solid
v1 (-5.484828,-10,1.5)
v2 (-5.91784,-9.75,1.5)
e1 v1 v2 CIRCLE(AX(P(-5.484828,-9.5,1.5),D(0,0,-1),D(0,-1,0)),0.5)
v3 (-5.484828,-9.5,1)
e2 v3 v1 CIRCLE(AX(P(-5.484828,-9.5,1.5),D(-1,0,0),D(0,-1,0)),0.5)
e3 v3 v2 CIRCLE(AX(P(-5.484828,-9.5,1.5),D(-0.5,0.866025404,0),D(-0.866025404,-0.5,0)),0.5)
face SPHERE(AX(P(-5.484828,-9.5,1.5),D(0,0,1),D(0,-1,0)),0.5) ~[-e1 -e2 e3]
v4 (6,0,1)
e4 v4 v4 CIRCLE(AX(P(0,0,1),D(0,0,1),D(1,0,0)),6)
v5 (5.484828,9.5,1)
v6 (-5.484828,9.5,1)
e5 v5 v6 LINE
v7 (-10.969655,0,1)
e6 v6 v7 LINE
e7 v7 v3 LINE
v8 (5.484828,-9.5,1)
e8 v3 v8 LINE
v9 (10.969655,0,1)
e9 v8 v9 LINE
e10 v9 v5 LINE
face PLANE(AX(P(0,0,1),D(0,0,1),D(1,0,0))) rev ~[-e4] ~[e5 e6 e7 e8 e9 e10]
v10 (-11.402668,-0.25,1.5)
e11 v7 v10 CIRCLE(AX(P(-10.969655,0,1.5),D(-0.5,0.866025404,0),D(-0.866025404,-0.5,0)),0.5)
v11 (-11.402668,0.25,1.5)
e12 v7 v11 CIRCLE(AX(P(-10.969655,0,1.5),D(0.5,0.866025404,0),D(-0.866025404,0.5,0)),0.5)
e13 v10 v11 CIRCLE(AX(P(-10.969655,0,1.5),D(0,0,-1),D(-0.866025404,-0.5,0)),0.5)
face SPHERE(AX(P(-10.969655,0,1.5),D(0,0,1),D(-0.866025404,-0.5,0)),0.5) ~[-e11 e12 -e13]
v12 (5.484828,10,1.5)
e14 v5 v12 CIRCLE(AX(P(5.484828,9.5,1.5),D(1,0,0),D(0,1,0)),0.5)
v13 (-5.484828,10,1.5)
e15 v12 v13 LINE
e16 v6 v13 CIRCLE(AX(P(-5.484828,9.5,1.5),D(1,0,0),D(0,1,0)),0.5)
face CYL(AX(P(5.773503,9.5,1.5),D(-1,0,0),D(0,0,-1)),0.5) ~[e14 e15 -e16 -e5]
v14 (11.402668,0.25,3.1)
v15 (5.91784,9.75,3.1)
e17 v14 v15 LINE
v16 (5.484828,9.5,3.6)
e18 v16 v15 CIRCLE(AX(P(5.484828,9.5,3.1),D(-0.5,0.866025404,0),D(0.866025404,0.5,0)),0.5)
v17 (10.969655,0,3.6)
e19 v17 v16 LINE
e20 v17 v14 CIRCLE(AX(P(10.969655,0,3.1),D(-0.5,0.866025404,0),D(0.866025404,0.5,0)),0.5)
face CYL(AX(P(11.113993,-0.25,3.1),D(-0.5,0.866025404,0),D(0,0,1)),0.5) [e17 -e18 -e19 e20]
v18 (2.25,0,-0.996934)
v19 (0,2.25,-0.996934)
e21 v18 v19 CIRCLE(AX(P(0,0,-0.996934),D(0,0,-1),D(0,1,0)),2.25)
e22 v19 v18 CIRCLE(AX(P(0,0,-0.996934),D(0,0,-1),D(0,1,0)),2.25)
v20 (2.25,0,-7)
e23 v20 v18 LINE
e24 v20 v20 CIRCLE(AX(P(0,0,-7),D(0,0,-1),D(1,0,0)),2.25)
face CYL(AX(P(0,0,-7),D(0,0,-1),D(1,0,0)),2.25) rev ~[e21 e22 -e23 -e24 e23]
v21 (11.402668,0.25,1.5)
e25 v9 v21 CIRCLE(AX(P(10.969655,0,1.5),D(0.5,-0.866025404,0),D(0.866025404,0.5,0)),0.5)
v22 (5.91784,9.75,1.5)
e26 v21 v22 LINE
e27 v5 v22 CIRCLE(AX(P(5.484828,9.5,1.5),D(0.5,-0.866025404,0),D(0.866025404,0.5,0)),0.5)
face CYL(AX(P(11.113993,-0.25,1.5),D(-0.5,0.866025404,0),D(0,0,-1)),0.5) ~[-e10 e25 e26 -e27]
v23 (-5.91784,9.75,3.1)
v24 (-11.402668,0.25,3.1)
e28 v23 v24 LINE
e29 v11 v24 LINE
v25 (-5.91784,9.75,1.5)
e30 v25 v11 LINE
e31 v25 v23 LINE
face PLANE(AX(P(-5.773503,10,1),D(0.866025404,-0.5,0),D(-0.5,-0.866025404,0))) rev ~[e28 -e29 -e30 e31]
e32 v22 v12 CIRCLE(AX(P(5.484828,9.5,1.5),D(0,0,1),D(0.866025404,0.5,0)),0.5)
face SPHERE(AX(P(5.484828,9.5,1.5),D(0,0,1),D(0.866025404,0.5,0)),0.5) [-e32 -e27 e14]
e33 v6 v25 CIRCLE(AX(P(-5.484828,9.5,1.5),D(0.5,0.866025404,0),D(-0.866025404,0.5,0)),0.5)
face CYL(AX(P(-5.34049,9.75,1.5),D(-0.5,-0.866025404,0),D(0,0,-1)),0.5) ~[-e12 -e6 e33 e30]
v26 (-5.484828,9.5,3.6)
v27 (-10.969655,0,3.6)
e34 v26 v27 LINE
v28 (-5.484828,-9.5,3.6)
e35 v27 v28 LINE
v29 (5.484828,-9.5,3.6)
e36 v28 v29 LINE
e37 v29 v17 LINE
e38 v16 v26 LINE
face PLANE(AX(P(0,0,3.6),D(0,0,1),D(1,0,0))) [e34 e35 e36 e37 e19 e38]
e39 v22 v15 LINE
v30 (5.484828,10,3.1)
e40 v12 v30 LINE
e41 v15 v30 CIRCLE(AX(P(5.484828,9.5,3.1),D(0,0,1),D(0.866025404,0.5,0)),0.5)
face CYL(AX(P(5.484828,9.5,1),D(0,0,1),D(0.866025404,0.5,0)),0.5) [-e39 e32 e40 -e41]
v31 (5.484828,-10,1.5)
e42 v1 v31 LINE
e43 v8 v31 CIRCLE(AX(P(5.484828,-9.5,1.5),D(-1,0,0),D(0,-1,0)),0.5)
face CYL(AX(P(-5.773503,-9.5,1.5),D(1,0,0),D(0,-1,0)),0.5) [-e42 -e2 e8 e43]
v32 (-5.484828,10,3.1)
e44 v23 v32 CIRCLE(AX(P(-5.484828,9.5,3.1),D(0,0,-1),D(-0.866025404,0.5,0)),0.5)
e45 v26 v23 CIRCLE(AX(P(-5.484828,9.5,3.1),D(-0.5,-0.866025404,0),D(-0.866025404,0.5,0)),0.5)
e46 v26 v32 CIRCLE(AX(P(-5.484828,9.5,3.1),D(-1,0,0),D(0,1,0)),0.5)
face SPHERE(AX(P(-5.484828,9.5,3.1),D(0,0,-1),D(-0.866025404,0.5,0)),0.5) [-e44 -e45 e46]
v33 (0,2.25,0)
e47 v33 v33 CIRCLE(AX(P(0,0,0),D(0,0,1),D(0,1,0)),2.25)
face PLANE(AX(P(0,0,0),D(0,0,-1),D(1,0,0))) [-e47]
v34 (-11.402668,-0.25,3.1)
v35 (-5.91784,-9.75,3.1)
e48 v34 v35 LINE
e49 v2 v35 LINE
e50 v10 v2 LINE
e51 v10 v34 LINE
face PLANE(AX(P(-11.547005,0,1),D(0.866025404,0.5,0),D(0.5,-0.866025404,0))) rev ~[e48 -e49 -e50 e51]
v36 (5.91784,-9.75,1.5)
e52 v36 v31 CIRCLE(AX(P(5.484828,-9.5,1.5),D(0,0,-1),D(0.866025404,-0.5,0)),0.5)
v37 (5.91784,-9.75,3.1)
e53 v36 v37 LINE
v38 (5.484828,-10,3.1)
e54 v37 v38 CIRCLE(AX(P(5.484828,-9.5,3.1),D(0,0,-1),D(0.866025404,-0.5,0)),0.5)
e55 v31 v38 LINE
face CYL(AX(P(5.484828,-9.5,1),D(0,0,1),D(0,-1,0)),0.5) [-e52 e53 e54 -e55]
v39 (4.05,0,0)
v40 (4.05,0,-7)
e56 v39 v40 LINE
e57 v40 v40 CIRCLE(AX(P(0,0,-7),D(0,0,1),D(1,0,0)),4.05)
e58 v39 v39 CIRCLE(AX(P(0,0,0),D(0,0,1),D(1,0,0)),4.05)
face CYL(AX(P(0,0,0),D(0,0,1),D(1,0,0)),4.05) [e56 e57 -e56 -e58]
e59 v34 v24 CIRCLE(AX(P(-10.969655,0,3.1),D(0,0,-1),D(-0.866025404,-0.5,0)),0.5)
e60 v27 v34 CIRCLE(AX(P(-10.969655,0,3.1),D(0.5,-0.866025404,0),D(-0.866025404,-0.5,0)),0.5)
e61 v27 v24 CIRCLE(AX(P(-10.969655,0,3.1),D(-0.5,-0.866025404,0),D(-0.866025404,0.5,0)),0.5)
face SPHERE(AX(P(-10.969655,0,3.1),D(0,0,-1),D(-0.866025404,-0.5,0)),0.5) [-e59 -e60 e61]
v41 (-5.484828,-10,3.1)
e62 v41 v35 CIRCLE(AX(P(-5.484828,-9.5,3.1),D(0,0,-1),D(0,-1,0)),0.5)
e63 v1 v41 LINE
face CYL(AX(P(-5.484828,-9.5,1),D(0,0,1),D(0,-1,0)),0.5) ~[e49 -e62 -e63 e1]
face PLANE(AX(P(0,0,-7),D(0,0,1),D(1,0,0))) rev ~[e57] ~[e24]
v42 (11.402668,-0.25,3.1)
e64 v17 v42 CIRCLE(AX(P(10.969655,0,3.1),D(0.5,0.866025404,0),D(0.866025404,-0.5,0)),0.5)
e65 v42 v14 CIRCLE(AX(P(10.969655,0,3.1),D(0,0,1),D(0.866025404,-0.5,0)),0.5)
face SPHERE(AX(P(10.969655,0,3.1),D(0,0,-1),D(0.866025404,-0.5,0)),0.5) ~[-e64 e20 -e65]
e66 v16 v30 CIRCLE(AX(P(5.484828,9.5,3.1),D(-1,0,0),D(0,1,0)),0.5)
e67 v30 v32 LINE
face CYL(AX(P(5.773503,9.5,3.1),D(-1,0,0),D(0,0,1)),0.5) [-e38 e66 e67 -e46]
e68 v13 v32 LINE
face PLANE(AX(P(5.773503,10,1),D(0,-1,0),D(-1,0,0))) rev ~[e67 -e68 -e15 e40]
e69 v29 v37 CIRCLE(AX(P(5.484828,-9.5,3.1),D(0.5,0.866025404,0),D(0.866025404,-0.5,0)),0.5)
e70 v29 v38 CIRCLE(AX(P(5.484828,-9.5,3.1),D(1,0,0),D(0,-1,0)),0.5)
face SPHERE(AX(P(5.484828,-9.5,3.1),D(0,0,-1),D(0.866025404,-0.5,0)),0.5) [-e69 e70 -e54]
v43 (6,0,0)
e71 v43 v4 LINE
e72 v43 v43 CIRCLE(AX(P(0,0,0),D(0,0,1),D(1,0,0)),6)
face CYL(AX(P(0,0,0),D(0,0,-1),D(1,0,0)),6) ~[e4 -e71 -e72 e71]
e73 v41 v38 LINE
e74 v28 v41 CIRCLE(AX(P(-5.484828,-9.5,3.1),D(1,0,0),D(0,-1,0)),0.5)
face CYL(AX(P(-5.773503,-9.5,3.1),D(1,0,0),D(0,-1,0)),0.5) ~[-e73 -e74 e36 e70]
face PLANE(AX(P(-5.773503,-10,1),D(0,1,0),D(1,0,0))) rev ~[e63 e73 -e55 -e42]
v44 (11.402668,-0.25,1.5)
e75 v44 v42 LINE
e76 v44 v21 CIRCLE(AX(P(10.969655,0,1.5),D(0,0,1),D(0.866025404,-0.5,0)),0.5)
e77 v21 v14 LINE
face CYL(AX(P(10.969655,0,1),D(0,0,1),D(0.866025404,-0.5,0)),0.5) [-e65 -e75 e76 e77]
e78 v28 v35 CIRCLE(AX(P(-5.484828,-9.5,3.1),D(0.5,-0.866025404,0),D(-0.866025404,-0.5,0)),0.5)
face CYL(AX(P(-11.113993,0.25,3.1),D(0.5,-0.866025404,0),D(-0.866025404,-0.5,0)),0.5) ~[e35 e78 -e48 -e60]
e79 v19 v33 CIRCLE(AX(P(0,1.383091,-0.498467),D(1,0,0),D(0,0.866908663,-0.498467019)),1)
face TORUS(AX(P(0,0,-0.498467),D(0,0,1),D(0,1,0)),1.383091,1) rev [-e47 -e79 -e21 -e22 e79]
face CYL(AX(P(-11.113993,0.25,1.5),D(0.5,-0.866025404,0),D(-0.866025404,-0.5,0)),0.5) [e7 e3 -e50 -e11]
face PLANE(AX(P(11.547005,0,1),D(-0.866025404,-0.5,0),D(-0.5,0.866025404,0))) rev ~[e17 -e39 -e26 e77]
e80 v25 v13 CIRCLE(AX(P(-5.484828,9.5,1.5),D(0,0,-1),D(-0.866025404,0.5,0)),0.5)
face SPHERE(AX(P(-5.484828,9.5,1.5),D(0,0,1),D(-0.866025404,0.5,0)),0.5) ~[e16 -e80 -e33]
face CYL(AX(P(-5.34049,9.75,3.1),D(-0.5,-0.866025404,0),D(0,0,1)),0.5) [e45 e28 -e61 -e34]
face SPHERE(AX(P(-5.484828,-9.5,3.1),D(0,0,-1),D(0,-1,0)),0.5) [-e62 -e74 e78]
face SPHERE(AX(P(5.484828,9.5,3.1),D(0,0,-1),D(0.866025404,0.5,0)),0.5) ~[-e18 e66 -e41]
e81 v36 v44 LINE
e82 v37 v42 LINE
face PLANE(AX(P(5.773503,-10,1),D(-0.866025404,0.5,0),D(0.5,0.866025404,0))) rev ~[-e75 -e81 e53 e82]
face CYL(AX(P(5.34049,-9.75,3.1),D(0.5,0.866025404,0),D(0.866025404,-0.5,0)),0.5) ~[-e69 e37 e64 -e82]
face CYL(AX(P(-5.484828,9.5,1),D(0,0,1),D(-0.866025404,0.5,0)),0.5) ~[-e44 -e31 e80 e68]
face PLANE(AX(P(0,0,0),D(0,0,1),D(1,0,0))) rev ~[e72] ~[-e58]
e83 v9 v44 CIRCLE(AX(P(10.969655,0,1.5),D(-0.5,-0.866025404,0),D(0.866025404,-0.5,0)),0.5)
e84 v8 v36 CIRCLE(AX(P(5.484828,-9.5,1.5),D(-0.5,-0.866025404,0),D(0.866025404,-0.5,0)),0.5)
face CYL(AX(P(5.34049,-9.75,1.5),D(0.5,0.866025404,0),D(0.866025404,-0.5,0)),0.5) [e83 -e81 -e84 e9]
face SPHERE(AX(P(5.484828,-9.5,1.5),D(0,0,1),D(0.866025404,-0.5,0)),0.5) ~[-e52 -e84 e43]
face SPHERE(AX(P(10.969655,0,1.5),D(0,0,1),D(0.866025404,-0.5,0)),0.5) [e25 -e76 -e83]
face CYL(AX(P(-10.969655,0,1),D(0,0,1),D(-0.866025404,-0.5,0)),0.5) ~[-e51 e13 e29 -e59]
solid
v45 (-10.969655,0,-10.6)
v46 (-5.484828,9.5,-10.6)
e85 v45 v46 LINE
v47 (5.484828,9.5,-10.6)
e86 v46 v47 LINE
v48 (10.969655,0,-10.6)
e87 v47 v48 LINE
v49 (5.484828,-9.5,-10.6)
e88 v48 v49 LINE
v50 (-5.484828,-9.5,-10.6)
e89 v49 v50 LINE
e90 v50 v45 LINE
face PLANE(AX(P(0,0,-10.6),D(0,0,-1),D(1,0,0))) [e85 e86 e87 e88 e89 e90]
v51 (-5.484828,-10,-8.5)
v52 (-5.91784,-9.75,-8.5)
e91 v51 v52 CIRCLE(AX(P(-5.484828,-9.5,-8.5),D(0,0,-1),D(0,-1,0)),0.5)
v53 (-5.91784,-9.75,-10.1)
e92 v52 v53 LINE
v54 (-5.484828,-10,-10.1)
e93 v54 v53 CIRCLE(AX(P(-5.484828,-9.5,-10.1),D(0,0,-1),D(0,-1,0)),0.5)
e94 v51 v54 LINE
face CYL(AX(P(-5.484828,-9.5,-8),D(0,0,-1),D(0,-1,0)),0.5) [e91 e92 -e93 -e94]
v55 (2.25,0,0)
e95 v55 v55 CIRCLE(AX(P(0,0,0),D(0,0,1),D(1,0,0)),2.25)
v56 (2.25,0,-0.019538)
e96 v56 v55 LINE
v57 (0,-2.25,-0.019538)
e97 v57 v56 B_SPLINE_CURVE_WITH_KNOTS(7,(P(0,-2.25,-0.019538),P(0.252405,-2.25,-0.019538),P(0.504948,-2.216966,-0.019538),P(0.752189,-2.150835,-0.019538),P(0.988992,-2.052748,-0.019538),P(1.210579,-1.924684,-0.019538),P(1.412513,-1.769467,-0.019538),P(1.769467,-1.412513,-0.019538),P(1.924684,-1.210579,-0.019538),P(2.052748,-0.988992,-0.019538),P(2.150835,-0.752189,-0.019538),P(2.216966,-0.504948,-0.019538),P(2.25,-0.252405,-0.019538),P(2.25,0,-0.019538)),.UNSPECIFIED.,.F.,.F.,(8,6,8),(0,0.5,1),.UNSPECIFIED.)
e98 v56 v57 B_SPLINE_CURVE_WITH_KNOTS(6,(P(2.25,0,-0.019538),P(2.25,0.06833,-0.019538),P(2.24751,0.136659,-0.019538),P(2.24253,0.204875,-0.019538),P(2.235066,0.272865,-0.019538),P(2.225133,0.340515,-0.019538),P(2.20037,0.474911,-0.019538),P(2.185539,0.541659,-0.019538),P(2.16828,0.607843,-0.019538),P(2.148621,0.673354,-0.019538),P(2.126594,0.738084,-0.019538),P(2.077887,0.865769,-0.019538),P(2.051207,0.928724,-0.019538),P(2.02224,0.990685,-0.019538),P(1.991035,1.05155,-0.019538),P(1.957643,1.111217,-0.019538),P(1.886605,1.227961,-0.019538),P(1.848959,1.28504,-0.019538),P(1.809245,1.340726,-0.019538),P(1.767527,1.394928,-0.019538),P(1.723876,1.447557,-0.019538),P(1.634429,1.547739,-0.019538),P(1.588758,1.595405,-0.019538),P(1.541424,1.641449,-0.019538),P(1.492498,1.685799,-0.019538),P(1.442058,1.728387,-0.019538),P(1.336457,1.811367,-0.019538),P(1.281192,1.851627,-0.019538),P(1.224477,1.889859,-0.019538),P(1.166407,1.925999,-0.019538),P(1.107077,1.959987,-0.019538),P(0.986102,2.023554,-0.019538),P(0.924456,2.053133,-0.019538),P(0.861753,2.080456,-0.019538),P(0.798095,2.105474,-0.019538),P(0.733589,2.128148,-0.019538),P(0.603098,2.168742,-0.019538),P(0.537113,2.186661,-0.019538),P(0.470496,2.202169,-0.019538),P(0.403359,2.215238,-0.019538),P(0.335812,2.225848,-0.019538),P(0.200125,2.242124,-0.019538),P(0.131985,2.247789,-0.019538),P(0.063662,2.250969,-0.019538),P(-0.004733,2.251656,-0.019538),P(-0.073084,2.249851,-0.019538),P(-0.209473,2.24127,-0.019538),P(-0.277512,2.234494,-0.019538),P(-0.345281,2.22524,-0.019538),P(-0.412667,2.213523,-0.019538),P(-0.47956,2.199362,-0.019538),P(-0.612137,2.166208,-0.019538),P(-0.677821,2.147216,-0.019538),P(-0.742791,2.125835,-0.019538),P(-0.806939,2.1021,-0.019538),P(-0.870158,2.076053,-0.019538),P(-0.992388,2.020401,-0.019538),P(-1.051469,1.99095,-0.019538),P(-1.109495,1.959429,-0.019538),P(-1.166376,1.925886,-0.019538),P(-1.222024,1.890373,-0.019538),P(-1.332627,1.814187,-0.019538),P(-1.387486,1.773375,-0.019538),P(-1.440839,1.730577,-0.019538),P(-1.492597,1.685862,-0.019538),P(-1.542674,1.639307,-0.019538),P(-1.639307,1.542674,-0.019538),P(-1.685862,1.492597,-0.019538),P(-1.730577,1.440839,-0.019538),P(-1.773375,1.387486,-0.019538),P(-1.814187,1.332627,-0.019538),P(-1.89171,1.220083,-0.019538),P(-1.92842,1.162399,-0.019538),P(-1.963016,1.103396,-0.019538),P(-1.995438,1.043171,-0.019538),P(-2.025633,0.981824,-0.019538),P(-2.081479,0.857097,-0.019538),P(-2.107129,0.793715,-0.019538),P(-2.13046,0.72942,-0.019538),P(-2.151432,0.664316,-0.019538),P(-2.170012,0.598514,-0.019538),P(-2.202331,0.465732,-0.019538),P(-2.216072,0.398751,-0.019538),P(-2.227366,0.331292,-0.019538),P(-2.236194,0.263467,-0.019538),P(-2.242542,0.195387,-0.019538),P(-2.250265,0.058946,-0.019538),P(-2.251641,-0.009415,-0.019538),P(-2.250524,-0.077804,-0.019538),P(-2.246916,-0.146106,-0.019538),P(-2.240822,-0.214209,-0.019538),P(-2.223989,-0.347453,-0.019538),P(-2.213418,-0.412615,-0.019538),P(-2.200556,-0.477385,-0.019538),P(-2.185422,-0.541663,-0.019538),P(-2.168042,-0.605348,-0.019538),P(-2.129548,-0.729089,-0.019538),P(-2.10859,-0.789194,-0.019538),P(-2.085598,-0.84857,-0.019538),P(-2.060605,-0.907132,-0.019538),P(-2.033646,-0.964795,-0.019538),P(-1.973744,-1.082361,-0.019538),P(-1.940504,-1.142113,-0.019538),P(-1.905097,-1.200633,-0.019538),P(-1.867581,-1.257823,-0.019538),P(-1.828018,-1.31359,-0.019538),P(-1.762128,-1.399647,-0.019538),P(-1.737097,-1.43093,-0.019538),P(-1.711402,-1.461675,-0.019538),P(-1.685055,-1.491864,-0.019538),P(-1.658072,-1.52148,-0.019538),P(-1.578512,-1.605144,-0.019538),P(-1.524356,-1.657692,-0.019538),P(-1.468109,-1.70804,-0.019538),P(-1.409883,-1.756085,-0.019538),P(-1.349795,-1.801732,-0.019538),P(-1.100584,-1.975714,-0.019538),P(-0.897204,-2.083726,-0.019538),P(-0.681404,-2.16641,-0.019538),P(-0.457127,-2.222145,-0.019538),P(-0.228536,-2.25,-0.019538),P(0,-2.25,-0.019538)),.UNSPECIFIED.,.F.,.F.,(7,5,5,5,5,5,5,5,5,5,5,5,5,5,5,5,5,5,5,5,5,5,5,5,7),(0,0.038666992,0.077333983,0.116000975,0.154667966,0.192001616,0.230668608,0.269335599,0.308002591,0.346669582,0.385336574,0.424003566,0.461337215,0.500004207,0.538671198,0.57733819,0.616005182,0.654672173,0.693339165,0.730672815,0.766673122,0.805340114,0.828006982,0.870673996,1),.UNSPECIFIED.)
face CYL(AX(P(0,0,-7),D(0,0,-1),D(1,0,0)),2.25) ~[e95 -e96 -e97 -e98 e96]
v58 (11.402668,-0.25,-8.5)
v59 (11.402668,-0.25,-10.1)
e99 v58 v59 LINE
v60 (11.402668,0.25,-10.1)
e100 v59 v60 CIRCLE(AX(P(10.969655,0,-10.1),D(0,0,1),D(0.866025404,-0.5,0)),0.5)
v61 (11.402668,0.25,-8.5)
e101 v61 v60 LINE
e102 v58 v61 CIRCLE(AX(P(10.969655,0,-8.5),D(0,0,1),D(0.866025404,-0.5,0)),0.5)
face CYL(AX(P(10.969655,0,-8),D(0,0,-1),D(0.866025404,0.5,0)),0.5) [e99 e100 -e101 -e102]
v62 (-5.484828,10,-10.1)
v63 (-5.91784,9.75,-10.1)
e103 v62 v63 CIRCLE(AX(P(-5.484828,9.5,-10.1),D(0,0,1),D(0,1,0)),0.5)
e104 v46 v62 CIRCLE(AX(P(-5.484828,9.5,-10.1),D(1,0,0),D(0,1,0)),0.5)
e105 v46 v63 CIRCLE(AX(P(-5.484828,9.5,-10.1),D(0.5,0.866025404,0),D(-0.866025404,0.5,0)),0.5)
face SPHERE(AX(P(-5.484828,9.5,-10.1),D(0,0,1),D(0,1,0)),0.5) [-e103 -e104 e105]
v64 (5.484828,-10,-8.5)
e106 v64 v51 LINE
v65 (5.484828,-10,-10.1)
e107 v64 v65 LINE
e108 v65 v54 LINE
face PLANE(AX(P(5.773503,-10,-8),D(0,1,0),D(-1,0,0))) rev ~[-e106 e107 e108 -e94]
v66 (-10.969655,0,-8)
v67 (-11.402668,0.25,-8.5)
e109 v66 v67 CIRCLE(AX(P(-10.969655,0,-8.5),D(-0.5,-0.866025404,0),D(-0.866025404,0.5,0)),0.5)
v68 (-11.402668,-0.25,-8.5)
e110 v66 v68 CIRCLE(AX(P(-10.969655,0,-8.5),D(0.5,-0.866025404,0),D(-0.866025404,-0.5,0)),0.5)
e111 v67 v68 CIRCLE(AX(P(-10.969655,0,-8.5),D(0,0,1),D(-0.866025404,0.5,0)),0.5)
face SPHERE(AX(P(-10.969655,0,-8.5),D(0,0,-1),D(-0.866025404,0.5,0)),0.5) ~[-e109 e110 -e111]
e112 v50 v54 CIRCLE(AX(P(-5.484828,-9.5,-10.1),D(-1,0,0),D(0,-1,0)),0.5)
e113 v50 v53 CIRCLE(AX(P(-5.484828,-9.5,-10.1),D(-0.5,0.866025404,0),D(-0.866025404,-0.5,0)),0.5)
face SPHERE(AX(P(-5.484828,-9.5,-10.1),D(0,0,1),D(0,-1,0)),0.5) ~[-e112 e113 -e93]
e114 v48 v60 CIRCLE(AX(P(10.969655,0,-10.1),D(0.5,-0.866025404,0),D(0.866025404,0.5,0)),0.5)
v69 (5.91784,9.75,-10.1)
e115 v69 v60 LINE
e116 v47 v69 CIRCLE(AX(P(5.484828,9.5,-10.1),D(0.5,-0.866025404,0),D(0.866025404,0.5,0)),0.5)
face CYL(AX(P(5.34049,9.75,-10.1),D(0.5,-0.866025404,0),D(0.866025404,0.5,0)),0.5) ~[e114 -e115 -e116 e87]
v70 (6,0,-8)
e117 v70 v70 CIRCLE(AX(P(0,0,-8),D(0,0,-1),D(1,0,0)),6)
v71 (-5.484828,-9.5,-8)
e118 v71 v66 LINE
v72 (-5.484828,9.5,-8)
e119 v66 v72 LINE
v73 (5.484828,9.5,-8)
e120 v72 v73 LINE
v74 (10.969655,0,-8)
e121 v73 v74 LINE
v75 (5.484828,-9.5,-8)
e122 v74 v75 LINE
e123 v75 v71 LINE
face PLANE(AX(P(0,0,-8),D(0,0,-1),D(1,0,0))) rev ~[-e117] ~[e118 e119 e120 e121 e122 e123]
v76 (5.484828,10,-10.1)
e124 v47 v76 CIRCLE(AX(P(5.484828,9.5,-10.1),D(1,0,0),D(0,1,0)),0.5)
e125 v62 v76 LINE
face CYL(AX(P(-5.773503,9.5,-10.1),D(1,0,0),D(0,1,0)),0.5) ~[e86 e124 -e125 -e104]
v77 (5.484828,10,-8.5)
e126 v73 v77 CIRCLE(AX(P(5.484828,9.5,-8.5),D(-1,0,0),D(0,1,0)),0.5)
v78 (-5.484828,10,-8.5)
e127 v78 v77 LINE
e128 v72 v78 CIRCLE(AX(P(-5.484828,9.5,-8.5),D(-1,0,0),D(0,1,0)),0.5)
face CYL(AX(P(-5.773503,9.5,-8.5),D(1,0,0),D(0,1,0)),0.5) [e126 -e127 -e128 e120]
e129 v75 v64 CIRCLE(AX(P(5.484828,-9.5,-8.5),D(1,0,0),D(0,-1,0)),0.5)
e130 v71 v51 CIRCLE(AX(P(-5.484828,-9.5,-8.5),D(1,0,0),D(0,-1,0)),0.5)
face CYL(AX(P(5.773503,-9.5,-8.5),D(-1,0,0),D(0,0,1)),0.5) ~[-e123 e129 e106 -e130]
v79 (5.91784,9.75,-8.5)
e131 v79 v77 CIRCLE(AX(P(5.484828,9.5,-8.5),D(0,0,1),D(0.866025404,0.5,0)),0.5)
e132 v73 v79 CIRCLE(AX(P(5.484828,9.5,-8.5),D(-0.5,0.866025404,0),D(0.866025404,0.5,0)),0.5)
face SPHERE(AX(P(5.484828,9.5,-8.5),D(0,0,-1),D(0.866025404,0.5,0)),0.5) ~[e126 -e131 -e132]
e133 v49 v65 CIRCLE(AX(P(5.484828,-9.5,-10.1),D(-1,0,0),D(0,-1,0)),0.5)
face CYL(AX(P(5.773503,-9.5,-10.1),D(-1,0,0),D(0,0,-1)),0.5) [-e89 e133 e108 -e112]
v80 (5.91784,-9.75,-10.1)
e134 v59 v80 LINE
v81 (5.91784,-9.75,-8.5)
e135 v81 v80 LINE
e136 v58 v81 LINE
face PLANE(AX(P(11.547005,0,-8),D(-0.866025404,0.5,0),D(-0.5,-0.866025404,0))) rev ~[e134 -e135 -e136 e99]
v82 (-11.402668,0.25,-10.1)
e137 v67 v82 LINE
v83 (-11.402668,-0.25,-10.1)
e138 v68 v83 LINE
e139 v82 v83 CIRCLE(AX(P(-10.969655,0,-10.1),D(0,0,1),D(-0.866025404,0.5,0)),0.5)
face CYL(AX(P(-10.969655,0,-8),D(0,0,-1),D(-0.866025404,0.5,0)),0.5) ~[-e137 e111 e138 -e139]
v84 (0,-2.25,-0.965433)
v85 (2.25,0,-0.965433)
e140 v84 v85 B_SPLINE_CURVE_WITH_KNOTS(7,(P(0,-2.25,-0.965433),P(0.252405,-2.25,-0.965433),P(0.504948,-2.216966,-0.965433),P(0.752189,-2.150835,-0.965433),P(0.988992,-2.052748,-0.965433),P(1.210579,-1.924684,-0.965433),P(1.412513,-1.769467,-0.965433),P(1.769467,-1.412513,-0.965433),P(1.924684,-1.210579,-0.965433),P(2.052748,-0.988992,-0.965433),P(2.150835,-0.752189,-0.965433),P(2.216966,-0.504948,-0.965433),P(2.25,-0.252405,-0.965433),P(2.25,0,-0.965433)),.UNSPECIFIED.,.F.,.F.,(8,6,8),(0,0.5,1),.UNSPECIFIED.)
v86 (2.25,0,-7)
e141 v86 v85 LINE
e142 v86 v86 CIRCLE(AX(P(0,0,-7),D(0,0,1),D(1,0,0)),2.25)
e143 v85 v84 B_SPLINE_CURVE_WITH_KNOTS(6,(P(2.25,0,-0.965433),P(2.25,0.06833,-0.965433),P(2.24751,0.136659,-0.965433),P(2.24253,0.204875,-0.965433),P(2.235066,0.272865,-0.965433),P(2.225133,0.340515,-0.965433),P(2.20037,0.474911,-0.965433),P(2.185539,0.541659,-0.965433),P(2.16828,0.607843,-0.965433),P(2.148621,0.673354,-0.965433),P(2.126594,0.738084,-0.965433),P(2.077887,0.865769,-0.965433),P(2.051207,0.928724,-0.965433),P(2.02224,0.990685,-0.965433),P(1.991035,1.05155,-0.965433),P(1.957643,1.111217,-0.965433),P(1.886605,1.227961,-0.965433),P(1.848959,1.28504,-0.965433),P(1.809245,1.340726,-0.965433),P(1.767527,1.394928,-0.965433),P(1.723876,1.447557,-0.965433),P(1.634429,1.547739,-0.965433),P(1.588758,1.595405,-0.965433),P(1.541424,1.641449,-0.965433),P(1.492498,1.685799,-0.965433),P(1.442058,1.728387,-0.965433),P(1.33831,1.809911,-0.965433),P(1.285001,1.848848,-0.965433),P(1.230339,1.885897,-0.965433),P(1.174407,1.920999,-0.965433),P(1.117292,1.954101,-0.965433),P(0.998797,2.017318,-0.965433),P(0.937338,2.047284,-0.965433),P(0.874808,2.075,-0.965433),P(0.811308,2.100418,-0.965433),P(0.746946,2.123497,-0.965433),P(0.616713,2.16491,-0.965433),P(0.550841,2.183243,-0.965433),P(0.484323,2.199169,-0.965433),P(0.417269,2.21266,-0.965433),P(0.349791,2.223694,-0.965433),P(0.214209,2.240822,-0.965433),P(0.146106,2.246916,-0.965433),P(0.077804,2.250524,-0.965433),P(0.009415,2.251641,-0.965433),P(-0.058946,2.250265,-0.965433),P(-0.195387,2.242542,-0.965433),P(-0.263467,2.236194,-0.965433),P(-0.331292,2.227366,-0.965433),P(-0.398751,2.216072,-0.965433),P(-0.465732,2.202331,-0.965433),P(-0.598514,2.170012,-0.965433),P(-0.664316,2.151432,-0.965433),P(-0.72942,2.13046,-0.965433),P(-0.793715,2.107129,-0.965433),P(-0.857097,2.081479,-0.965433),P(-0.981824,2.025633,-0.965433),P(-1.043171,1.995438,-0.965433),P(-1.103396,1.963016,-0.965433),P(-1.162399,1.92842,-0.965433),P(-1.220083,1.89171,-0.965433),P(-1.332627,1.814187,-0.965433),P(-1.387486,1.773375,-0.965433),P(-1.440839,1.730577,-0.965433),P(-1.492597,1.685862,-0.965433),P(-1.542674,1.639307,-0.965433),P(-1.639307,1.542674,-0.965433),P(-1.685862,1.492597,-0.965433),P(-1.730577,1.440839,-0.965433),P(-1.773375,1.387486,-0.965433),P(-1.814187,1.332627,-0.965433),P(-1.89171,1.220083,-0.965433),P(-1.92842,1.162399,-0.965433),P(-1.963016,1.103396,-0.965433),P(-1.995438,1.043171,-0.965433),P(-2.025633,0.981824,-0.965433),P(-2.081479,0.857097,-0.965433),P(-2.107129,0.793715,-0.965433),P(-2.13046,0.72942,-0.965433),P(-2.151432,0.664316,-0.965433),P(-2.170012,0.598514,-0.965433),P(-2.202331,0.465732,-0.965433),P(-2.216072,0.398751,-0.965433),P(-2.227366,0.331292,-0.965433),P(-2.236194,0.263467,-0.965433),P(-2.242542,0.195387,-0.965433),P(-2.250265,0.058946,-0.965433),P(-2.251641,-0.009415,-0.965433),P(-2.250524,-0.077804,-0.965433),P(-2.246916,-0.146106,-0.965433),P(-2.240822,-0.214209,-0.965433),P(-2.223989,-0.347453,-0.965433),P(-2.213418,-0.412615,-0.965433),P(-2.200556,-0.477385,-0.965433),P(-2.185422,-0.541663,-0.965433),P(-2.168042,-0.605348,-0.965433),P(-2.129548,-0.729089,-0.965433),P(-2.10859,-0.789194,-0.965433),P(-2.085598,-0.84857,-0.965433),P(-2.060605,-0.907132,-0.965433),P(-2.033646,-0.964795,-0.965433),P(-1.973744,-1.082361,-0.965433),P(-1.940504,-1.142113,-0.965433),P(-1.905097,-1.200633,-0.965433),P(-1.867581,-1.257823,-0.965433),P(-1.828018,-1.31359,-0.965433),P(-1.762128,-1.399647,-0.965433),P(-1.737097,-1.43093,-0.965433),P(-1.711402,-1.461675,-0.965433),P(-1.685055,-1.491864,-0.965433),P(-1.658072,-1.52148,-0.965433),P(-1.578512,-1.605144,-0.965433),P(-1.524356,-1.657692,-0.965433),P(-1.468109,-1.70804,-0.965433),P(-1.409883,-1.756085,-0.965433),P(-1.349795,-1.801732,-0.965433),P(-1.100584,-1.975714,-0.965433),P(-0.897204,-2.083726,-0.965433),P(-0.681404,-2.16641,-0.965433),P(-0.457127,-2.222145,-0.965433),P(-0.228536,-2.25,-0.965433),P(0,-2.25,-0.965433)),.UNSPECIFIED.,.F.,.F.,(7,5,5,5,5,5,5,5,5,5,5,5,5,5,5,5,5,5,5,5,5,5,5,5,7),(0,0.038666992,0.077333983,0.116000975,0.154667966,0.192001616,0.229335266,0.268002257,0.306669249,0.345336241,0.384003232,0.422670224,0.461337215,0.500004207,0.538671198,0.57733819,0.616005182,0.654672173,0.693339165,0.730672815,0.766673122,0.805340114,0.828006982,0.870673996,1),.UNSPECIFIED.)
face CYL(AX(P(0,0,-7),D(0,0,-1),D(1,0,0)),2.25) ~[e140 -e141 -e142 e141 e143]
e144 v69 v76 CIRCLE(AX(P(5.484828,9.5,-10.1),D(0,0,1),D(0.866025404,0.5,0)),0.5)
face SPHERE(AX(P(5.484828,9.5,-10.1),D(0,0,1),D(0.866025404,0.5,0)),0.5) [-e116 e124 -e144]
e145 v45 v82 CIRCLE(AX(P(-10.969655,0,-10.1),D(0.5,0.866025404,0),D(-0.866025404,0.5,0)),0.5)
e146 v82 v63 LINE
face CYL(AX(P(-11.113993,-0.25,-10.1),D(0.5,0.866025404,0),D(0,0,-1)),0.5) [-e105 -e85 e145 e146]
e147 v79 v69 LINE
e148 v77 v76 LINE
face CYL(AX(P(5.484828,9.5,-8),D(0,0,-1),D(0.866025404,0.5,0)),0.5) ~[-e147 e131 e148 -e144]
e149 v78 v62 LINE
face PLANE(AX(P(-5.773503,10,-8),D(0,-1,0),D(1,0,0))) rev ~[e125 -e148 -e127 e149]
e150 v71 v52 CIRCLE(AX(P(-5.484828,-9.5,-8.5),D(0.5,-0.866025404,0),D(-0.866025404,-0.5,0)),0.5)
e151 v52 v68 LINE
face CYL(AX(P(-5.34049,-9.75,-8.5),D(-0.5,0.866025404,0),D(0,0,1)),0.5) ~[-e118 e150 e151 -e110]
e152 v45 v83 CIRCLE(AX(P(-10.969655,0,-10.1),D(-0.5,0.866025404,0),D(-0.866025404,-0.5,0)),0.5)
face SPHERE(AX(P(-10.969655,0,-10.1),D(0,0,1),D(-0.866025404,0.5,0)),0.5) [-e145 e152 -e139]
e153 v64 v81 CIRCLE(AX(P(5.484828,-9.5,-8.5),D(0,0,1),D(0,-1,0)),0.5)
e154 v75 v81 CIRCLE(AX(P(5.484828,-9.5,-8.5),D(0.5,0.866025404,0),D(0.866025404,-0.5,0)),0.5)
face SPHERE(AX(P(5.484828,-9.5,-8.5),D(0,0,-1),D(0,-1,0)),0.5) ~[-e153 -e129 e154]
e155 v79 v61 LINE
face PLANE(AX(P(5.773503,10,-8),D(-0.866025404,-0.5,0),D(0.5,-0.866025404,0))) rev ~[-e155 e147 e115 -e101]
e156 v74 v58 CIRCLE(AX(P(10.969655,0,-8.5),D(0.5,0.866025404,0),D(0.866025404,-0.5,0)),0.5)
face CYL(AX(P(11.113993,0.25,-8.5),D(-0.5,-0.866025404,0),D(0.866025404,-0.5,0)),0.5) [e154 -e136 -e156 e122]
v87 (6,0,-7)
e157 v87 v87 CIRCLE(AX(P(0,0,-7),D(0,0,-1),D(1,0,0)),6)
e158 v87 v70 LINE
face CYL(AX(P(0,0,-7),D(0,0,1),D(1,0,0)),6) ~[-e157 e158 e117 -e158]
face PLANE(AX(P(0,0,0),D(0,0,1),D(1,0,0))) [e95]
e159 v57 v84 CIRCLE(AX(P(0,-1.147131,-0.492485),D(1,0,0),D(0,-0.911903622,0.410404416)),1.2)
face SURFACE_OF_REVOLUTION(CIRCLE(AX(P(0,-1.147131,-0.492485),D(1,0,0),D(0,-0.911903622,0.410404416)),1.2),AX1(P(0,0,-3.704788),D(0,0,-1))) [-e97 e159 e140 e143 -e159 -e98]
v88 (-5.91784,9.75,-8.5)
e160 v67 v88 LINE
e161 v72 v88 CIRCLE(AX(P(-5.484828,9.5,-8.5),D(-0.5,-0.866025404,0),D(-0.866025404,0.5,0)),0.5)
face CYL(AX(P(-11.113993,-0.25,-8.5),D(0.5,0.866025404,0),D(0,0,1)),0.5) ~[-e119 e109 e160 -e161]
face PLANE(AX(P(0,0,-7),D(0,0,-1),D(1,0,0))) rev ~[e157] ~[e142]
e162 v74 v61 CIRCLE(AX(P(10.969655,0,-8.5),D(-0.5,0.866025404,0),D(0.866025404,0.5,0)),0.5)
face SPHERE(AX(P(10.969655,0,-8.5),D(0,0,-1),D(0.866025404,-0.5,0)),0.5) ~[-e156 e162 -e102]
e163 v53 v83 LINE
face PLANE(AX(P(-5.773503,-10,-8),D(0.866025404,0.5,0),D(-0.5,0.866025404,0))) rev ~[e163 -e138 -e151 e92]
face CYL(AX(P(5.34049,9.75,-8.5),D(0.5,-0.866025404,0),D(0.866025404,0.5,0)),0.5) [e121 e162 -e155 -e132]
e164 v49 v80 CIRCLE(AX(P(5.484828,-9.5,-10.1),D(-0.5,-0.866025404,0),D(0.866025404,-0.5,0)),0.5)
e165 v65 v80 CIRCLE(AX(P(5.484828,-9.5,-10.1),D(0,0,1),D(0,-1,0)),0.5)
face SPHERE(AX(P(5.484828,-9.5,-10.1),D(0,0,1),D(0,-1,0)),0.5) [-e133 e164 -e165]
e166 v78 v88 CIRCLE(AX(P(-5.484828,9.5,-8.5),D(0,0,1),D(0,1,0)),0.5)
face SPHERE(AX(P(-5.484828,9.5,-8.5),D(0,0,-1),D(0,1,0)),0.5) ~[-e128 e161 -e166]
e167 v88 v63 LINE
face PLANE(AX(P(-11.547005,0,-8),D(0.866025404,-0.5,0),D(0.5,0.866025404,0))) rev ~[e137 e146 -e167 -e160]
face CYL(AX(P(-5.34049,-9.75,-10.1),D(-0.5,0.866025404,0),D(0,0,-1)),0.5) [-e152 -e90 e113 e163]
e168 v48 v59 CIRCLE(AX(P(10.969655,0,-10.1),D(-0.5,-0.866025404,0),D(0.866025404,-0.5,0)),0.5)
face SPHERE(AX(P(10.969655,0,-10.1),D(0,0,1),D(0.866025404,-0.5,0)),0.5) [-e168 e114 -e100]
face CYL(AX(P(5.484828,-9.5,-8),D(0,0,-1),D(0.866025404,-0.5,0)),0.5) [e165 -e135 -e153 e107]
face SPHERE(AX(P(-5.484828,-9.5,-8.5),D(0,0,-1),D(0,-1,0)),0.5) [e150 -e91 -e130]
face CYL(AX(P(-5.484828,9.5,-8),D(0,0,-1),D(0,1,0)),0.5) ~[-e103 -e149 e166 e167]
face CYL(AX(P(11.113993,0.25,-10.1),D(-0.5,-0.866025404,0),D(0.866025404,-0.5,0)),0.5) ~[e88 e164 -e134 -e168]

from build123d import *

# Parameters (mm, degrees)
F0_R      = 6
F0_R_2    = 4.05
F1_DEPTH  = 1
F2_DEPTH  = 7
F4_DEPTH  = 2.6
F5_R      = 6
F5_R_2    = 4.05
F6_DEPTH  = 1
F8_DEPTH  = 2.6
F9_R      = 0.5
F9_2_R    = 0.5
F10_R     = 2.25
F11_DEPTH = 7
F14_R     = 2.25
F15_DEPTH = 7


with BuildPart() as f1:
    # F0 (on Top) → F1 (new body)
    with BuildSketch(Plane.XY):
        Circle(F0_R)
        Circle(F0_R_2, mode=Mode.SUBTRACT)
        Circle(F0_R_2)
    extrude(amount=F1_DEPTH)

    # F0 (on Top) → F2 (join)
    with BuildSketch(Plane.XY):
        Circle(F0_R_2)
    extrude(amount=-F2_DEPTH)

    # F3 (on face) → F4 (join)
    with BuildSketch(Plane.XY.offset(1)):
        Polygon((-5.7735026919, -10), (5.7735026919, -10), (11.5470053838, 0), (5.7735026919, 10), (-5.7735026919, 10), (-11.5470053838, 0), align=None)
    extrude(amount=F4_DEPTH)

    # F9
    f9_edges = [f1.edges().sort_by_distance(p)[0] for p in [
        (5.773503, -10, 2.3),
        (11.547005, 0, 2.3),
        (8.660254, -5, 1),
        (8.660254, -5, 3.6),
        (5.773503, 10, 2.3),
        (8.660254, 5, 1),
        (8.660254, 5, 3.6),
        (-5.773503, -10, 2.3),
        (0, -10, 1),
        (0, -10, 3.6),
        (-11.547005, 0, 2.3),
        (-8.660254, -5, 1),
        (-8.660254, -5, 3.6),
        (-5.773503, 10, 2.3),
        (-8.660254, 5, 1),
        (-8.660254, 5, 3.6),
        (0, 10, 1),
        (0, 10, 3.6),
    ]]
    fillet(f9_edges, radius=F9_R)

    # F10 (on face) → F11 (cut)
    with BuildSketch(Plane(origin=(0, 0, -7), x_dir=(1, 0, 0), z_dir=(0, 0, -1))):
        Circle(F10_R)
    extrude(amount=-F11_DEPTH, mode=Mode.SUBTRACT)

    # F12 (on Right) → F13 (revolve, cut)
    with BuildSketch(Plane.YZ):
        with BuildLine():
            Line((2.25, 0), (2.25, -0.996934039))
            ThreePointArc((2.25, -0.996934039), (2.3830913367, -0.4984670195), (2.25, 0))
        make_face()
    revolve(axis=Axis((0, 0, -3.8720492739), (0, 0, -1)), mode=Mode.SUBTRACT)


with BuildPart() as f6:
    # F5 (on face) → F6 (new body)
    with BuildSketch(Plane(origin=(0, 0, -7), x_dir=(1, 0, 0), z_dir=(0, 0, -1))):
        Circle(F5_R)
        Circle(F5_R_2, mode=Mode.SUBTRACT)
        Circle(F5_R_2)
    extrude(amount=F6_DEPTH)

    # F7 (on face) → F8 (join)
    with BuildSketch(Plane(origin=(0, 0, -8), x_dir=(1, 0, 0), z_dir=(0, 0, -1))):
        Polygon((5.7735026919, -10), (11.5470053838, 0), (5.7735026919, 10), (-5.7735026919, 10), (-11.5470053838, 0), (-5.7735026919, -10), align=None)
    extrude(amount=F8_DEPTH)

    # F9#2
    f9_2_edges = [f6.edges().sort_by_distance(p)[0] for p in [
        (5.773503, -10, -9.3),
        (-5.773503, -10, -9.3),
        (0, -10, -8),
        (0, -10, -10.6),
        (11.547005, 0, -9.3),
        (8.660254, -5, -8),
        (8.660254, -5, -10.6),
        (5.773503, 10, -9.3),
        (8.660254, 5, -8),
        (8.660254, 5, -10.6),
        (-5.773503, 10, -9.3),
        (0, 10, -8),
        (0, 10, -10.6),
        (-11.547005, 0, -9.3),
        (-8.660254, 5, -8),
        (-8.660254, 5, -10.6),
        (-8.660254, -5, -8),
        (-8.660254, -5, -10.6),
    ]]
    fillet(f9_2_edges, radius=F9_2_R)

    # F14 (on face) → F15 (join, through all)
    with BuildSketch(Plane.XY.offset(-7)):
        Circle(F14_R)
    extrude(amount=F15_DEPTH)

    # F16 (on Right) → F17 (revolve)
    with BuildSketch(Plane.YZ):
        with BuildLine():
            Line((-2.2414149716, -0.9849705966), (-2.2414149716, 0))
            ThreePointArc((-2.2414149716, 0), (-2.3471306252, -0.4924852983), (-2.2414149716, -0.9849705966))
        make_face()
    revolve(axis=Axis((0, 0, -3.7047876976), (0, 0, -1)))


solid = Compound([f1.part, f6.part])
